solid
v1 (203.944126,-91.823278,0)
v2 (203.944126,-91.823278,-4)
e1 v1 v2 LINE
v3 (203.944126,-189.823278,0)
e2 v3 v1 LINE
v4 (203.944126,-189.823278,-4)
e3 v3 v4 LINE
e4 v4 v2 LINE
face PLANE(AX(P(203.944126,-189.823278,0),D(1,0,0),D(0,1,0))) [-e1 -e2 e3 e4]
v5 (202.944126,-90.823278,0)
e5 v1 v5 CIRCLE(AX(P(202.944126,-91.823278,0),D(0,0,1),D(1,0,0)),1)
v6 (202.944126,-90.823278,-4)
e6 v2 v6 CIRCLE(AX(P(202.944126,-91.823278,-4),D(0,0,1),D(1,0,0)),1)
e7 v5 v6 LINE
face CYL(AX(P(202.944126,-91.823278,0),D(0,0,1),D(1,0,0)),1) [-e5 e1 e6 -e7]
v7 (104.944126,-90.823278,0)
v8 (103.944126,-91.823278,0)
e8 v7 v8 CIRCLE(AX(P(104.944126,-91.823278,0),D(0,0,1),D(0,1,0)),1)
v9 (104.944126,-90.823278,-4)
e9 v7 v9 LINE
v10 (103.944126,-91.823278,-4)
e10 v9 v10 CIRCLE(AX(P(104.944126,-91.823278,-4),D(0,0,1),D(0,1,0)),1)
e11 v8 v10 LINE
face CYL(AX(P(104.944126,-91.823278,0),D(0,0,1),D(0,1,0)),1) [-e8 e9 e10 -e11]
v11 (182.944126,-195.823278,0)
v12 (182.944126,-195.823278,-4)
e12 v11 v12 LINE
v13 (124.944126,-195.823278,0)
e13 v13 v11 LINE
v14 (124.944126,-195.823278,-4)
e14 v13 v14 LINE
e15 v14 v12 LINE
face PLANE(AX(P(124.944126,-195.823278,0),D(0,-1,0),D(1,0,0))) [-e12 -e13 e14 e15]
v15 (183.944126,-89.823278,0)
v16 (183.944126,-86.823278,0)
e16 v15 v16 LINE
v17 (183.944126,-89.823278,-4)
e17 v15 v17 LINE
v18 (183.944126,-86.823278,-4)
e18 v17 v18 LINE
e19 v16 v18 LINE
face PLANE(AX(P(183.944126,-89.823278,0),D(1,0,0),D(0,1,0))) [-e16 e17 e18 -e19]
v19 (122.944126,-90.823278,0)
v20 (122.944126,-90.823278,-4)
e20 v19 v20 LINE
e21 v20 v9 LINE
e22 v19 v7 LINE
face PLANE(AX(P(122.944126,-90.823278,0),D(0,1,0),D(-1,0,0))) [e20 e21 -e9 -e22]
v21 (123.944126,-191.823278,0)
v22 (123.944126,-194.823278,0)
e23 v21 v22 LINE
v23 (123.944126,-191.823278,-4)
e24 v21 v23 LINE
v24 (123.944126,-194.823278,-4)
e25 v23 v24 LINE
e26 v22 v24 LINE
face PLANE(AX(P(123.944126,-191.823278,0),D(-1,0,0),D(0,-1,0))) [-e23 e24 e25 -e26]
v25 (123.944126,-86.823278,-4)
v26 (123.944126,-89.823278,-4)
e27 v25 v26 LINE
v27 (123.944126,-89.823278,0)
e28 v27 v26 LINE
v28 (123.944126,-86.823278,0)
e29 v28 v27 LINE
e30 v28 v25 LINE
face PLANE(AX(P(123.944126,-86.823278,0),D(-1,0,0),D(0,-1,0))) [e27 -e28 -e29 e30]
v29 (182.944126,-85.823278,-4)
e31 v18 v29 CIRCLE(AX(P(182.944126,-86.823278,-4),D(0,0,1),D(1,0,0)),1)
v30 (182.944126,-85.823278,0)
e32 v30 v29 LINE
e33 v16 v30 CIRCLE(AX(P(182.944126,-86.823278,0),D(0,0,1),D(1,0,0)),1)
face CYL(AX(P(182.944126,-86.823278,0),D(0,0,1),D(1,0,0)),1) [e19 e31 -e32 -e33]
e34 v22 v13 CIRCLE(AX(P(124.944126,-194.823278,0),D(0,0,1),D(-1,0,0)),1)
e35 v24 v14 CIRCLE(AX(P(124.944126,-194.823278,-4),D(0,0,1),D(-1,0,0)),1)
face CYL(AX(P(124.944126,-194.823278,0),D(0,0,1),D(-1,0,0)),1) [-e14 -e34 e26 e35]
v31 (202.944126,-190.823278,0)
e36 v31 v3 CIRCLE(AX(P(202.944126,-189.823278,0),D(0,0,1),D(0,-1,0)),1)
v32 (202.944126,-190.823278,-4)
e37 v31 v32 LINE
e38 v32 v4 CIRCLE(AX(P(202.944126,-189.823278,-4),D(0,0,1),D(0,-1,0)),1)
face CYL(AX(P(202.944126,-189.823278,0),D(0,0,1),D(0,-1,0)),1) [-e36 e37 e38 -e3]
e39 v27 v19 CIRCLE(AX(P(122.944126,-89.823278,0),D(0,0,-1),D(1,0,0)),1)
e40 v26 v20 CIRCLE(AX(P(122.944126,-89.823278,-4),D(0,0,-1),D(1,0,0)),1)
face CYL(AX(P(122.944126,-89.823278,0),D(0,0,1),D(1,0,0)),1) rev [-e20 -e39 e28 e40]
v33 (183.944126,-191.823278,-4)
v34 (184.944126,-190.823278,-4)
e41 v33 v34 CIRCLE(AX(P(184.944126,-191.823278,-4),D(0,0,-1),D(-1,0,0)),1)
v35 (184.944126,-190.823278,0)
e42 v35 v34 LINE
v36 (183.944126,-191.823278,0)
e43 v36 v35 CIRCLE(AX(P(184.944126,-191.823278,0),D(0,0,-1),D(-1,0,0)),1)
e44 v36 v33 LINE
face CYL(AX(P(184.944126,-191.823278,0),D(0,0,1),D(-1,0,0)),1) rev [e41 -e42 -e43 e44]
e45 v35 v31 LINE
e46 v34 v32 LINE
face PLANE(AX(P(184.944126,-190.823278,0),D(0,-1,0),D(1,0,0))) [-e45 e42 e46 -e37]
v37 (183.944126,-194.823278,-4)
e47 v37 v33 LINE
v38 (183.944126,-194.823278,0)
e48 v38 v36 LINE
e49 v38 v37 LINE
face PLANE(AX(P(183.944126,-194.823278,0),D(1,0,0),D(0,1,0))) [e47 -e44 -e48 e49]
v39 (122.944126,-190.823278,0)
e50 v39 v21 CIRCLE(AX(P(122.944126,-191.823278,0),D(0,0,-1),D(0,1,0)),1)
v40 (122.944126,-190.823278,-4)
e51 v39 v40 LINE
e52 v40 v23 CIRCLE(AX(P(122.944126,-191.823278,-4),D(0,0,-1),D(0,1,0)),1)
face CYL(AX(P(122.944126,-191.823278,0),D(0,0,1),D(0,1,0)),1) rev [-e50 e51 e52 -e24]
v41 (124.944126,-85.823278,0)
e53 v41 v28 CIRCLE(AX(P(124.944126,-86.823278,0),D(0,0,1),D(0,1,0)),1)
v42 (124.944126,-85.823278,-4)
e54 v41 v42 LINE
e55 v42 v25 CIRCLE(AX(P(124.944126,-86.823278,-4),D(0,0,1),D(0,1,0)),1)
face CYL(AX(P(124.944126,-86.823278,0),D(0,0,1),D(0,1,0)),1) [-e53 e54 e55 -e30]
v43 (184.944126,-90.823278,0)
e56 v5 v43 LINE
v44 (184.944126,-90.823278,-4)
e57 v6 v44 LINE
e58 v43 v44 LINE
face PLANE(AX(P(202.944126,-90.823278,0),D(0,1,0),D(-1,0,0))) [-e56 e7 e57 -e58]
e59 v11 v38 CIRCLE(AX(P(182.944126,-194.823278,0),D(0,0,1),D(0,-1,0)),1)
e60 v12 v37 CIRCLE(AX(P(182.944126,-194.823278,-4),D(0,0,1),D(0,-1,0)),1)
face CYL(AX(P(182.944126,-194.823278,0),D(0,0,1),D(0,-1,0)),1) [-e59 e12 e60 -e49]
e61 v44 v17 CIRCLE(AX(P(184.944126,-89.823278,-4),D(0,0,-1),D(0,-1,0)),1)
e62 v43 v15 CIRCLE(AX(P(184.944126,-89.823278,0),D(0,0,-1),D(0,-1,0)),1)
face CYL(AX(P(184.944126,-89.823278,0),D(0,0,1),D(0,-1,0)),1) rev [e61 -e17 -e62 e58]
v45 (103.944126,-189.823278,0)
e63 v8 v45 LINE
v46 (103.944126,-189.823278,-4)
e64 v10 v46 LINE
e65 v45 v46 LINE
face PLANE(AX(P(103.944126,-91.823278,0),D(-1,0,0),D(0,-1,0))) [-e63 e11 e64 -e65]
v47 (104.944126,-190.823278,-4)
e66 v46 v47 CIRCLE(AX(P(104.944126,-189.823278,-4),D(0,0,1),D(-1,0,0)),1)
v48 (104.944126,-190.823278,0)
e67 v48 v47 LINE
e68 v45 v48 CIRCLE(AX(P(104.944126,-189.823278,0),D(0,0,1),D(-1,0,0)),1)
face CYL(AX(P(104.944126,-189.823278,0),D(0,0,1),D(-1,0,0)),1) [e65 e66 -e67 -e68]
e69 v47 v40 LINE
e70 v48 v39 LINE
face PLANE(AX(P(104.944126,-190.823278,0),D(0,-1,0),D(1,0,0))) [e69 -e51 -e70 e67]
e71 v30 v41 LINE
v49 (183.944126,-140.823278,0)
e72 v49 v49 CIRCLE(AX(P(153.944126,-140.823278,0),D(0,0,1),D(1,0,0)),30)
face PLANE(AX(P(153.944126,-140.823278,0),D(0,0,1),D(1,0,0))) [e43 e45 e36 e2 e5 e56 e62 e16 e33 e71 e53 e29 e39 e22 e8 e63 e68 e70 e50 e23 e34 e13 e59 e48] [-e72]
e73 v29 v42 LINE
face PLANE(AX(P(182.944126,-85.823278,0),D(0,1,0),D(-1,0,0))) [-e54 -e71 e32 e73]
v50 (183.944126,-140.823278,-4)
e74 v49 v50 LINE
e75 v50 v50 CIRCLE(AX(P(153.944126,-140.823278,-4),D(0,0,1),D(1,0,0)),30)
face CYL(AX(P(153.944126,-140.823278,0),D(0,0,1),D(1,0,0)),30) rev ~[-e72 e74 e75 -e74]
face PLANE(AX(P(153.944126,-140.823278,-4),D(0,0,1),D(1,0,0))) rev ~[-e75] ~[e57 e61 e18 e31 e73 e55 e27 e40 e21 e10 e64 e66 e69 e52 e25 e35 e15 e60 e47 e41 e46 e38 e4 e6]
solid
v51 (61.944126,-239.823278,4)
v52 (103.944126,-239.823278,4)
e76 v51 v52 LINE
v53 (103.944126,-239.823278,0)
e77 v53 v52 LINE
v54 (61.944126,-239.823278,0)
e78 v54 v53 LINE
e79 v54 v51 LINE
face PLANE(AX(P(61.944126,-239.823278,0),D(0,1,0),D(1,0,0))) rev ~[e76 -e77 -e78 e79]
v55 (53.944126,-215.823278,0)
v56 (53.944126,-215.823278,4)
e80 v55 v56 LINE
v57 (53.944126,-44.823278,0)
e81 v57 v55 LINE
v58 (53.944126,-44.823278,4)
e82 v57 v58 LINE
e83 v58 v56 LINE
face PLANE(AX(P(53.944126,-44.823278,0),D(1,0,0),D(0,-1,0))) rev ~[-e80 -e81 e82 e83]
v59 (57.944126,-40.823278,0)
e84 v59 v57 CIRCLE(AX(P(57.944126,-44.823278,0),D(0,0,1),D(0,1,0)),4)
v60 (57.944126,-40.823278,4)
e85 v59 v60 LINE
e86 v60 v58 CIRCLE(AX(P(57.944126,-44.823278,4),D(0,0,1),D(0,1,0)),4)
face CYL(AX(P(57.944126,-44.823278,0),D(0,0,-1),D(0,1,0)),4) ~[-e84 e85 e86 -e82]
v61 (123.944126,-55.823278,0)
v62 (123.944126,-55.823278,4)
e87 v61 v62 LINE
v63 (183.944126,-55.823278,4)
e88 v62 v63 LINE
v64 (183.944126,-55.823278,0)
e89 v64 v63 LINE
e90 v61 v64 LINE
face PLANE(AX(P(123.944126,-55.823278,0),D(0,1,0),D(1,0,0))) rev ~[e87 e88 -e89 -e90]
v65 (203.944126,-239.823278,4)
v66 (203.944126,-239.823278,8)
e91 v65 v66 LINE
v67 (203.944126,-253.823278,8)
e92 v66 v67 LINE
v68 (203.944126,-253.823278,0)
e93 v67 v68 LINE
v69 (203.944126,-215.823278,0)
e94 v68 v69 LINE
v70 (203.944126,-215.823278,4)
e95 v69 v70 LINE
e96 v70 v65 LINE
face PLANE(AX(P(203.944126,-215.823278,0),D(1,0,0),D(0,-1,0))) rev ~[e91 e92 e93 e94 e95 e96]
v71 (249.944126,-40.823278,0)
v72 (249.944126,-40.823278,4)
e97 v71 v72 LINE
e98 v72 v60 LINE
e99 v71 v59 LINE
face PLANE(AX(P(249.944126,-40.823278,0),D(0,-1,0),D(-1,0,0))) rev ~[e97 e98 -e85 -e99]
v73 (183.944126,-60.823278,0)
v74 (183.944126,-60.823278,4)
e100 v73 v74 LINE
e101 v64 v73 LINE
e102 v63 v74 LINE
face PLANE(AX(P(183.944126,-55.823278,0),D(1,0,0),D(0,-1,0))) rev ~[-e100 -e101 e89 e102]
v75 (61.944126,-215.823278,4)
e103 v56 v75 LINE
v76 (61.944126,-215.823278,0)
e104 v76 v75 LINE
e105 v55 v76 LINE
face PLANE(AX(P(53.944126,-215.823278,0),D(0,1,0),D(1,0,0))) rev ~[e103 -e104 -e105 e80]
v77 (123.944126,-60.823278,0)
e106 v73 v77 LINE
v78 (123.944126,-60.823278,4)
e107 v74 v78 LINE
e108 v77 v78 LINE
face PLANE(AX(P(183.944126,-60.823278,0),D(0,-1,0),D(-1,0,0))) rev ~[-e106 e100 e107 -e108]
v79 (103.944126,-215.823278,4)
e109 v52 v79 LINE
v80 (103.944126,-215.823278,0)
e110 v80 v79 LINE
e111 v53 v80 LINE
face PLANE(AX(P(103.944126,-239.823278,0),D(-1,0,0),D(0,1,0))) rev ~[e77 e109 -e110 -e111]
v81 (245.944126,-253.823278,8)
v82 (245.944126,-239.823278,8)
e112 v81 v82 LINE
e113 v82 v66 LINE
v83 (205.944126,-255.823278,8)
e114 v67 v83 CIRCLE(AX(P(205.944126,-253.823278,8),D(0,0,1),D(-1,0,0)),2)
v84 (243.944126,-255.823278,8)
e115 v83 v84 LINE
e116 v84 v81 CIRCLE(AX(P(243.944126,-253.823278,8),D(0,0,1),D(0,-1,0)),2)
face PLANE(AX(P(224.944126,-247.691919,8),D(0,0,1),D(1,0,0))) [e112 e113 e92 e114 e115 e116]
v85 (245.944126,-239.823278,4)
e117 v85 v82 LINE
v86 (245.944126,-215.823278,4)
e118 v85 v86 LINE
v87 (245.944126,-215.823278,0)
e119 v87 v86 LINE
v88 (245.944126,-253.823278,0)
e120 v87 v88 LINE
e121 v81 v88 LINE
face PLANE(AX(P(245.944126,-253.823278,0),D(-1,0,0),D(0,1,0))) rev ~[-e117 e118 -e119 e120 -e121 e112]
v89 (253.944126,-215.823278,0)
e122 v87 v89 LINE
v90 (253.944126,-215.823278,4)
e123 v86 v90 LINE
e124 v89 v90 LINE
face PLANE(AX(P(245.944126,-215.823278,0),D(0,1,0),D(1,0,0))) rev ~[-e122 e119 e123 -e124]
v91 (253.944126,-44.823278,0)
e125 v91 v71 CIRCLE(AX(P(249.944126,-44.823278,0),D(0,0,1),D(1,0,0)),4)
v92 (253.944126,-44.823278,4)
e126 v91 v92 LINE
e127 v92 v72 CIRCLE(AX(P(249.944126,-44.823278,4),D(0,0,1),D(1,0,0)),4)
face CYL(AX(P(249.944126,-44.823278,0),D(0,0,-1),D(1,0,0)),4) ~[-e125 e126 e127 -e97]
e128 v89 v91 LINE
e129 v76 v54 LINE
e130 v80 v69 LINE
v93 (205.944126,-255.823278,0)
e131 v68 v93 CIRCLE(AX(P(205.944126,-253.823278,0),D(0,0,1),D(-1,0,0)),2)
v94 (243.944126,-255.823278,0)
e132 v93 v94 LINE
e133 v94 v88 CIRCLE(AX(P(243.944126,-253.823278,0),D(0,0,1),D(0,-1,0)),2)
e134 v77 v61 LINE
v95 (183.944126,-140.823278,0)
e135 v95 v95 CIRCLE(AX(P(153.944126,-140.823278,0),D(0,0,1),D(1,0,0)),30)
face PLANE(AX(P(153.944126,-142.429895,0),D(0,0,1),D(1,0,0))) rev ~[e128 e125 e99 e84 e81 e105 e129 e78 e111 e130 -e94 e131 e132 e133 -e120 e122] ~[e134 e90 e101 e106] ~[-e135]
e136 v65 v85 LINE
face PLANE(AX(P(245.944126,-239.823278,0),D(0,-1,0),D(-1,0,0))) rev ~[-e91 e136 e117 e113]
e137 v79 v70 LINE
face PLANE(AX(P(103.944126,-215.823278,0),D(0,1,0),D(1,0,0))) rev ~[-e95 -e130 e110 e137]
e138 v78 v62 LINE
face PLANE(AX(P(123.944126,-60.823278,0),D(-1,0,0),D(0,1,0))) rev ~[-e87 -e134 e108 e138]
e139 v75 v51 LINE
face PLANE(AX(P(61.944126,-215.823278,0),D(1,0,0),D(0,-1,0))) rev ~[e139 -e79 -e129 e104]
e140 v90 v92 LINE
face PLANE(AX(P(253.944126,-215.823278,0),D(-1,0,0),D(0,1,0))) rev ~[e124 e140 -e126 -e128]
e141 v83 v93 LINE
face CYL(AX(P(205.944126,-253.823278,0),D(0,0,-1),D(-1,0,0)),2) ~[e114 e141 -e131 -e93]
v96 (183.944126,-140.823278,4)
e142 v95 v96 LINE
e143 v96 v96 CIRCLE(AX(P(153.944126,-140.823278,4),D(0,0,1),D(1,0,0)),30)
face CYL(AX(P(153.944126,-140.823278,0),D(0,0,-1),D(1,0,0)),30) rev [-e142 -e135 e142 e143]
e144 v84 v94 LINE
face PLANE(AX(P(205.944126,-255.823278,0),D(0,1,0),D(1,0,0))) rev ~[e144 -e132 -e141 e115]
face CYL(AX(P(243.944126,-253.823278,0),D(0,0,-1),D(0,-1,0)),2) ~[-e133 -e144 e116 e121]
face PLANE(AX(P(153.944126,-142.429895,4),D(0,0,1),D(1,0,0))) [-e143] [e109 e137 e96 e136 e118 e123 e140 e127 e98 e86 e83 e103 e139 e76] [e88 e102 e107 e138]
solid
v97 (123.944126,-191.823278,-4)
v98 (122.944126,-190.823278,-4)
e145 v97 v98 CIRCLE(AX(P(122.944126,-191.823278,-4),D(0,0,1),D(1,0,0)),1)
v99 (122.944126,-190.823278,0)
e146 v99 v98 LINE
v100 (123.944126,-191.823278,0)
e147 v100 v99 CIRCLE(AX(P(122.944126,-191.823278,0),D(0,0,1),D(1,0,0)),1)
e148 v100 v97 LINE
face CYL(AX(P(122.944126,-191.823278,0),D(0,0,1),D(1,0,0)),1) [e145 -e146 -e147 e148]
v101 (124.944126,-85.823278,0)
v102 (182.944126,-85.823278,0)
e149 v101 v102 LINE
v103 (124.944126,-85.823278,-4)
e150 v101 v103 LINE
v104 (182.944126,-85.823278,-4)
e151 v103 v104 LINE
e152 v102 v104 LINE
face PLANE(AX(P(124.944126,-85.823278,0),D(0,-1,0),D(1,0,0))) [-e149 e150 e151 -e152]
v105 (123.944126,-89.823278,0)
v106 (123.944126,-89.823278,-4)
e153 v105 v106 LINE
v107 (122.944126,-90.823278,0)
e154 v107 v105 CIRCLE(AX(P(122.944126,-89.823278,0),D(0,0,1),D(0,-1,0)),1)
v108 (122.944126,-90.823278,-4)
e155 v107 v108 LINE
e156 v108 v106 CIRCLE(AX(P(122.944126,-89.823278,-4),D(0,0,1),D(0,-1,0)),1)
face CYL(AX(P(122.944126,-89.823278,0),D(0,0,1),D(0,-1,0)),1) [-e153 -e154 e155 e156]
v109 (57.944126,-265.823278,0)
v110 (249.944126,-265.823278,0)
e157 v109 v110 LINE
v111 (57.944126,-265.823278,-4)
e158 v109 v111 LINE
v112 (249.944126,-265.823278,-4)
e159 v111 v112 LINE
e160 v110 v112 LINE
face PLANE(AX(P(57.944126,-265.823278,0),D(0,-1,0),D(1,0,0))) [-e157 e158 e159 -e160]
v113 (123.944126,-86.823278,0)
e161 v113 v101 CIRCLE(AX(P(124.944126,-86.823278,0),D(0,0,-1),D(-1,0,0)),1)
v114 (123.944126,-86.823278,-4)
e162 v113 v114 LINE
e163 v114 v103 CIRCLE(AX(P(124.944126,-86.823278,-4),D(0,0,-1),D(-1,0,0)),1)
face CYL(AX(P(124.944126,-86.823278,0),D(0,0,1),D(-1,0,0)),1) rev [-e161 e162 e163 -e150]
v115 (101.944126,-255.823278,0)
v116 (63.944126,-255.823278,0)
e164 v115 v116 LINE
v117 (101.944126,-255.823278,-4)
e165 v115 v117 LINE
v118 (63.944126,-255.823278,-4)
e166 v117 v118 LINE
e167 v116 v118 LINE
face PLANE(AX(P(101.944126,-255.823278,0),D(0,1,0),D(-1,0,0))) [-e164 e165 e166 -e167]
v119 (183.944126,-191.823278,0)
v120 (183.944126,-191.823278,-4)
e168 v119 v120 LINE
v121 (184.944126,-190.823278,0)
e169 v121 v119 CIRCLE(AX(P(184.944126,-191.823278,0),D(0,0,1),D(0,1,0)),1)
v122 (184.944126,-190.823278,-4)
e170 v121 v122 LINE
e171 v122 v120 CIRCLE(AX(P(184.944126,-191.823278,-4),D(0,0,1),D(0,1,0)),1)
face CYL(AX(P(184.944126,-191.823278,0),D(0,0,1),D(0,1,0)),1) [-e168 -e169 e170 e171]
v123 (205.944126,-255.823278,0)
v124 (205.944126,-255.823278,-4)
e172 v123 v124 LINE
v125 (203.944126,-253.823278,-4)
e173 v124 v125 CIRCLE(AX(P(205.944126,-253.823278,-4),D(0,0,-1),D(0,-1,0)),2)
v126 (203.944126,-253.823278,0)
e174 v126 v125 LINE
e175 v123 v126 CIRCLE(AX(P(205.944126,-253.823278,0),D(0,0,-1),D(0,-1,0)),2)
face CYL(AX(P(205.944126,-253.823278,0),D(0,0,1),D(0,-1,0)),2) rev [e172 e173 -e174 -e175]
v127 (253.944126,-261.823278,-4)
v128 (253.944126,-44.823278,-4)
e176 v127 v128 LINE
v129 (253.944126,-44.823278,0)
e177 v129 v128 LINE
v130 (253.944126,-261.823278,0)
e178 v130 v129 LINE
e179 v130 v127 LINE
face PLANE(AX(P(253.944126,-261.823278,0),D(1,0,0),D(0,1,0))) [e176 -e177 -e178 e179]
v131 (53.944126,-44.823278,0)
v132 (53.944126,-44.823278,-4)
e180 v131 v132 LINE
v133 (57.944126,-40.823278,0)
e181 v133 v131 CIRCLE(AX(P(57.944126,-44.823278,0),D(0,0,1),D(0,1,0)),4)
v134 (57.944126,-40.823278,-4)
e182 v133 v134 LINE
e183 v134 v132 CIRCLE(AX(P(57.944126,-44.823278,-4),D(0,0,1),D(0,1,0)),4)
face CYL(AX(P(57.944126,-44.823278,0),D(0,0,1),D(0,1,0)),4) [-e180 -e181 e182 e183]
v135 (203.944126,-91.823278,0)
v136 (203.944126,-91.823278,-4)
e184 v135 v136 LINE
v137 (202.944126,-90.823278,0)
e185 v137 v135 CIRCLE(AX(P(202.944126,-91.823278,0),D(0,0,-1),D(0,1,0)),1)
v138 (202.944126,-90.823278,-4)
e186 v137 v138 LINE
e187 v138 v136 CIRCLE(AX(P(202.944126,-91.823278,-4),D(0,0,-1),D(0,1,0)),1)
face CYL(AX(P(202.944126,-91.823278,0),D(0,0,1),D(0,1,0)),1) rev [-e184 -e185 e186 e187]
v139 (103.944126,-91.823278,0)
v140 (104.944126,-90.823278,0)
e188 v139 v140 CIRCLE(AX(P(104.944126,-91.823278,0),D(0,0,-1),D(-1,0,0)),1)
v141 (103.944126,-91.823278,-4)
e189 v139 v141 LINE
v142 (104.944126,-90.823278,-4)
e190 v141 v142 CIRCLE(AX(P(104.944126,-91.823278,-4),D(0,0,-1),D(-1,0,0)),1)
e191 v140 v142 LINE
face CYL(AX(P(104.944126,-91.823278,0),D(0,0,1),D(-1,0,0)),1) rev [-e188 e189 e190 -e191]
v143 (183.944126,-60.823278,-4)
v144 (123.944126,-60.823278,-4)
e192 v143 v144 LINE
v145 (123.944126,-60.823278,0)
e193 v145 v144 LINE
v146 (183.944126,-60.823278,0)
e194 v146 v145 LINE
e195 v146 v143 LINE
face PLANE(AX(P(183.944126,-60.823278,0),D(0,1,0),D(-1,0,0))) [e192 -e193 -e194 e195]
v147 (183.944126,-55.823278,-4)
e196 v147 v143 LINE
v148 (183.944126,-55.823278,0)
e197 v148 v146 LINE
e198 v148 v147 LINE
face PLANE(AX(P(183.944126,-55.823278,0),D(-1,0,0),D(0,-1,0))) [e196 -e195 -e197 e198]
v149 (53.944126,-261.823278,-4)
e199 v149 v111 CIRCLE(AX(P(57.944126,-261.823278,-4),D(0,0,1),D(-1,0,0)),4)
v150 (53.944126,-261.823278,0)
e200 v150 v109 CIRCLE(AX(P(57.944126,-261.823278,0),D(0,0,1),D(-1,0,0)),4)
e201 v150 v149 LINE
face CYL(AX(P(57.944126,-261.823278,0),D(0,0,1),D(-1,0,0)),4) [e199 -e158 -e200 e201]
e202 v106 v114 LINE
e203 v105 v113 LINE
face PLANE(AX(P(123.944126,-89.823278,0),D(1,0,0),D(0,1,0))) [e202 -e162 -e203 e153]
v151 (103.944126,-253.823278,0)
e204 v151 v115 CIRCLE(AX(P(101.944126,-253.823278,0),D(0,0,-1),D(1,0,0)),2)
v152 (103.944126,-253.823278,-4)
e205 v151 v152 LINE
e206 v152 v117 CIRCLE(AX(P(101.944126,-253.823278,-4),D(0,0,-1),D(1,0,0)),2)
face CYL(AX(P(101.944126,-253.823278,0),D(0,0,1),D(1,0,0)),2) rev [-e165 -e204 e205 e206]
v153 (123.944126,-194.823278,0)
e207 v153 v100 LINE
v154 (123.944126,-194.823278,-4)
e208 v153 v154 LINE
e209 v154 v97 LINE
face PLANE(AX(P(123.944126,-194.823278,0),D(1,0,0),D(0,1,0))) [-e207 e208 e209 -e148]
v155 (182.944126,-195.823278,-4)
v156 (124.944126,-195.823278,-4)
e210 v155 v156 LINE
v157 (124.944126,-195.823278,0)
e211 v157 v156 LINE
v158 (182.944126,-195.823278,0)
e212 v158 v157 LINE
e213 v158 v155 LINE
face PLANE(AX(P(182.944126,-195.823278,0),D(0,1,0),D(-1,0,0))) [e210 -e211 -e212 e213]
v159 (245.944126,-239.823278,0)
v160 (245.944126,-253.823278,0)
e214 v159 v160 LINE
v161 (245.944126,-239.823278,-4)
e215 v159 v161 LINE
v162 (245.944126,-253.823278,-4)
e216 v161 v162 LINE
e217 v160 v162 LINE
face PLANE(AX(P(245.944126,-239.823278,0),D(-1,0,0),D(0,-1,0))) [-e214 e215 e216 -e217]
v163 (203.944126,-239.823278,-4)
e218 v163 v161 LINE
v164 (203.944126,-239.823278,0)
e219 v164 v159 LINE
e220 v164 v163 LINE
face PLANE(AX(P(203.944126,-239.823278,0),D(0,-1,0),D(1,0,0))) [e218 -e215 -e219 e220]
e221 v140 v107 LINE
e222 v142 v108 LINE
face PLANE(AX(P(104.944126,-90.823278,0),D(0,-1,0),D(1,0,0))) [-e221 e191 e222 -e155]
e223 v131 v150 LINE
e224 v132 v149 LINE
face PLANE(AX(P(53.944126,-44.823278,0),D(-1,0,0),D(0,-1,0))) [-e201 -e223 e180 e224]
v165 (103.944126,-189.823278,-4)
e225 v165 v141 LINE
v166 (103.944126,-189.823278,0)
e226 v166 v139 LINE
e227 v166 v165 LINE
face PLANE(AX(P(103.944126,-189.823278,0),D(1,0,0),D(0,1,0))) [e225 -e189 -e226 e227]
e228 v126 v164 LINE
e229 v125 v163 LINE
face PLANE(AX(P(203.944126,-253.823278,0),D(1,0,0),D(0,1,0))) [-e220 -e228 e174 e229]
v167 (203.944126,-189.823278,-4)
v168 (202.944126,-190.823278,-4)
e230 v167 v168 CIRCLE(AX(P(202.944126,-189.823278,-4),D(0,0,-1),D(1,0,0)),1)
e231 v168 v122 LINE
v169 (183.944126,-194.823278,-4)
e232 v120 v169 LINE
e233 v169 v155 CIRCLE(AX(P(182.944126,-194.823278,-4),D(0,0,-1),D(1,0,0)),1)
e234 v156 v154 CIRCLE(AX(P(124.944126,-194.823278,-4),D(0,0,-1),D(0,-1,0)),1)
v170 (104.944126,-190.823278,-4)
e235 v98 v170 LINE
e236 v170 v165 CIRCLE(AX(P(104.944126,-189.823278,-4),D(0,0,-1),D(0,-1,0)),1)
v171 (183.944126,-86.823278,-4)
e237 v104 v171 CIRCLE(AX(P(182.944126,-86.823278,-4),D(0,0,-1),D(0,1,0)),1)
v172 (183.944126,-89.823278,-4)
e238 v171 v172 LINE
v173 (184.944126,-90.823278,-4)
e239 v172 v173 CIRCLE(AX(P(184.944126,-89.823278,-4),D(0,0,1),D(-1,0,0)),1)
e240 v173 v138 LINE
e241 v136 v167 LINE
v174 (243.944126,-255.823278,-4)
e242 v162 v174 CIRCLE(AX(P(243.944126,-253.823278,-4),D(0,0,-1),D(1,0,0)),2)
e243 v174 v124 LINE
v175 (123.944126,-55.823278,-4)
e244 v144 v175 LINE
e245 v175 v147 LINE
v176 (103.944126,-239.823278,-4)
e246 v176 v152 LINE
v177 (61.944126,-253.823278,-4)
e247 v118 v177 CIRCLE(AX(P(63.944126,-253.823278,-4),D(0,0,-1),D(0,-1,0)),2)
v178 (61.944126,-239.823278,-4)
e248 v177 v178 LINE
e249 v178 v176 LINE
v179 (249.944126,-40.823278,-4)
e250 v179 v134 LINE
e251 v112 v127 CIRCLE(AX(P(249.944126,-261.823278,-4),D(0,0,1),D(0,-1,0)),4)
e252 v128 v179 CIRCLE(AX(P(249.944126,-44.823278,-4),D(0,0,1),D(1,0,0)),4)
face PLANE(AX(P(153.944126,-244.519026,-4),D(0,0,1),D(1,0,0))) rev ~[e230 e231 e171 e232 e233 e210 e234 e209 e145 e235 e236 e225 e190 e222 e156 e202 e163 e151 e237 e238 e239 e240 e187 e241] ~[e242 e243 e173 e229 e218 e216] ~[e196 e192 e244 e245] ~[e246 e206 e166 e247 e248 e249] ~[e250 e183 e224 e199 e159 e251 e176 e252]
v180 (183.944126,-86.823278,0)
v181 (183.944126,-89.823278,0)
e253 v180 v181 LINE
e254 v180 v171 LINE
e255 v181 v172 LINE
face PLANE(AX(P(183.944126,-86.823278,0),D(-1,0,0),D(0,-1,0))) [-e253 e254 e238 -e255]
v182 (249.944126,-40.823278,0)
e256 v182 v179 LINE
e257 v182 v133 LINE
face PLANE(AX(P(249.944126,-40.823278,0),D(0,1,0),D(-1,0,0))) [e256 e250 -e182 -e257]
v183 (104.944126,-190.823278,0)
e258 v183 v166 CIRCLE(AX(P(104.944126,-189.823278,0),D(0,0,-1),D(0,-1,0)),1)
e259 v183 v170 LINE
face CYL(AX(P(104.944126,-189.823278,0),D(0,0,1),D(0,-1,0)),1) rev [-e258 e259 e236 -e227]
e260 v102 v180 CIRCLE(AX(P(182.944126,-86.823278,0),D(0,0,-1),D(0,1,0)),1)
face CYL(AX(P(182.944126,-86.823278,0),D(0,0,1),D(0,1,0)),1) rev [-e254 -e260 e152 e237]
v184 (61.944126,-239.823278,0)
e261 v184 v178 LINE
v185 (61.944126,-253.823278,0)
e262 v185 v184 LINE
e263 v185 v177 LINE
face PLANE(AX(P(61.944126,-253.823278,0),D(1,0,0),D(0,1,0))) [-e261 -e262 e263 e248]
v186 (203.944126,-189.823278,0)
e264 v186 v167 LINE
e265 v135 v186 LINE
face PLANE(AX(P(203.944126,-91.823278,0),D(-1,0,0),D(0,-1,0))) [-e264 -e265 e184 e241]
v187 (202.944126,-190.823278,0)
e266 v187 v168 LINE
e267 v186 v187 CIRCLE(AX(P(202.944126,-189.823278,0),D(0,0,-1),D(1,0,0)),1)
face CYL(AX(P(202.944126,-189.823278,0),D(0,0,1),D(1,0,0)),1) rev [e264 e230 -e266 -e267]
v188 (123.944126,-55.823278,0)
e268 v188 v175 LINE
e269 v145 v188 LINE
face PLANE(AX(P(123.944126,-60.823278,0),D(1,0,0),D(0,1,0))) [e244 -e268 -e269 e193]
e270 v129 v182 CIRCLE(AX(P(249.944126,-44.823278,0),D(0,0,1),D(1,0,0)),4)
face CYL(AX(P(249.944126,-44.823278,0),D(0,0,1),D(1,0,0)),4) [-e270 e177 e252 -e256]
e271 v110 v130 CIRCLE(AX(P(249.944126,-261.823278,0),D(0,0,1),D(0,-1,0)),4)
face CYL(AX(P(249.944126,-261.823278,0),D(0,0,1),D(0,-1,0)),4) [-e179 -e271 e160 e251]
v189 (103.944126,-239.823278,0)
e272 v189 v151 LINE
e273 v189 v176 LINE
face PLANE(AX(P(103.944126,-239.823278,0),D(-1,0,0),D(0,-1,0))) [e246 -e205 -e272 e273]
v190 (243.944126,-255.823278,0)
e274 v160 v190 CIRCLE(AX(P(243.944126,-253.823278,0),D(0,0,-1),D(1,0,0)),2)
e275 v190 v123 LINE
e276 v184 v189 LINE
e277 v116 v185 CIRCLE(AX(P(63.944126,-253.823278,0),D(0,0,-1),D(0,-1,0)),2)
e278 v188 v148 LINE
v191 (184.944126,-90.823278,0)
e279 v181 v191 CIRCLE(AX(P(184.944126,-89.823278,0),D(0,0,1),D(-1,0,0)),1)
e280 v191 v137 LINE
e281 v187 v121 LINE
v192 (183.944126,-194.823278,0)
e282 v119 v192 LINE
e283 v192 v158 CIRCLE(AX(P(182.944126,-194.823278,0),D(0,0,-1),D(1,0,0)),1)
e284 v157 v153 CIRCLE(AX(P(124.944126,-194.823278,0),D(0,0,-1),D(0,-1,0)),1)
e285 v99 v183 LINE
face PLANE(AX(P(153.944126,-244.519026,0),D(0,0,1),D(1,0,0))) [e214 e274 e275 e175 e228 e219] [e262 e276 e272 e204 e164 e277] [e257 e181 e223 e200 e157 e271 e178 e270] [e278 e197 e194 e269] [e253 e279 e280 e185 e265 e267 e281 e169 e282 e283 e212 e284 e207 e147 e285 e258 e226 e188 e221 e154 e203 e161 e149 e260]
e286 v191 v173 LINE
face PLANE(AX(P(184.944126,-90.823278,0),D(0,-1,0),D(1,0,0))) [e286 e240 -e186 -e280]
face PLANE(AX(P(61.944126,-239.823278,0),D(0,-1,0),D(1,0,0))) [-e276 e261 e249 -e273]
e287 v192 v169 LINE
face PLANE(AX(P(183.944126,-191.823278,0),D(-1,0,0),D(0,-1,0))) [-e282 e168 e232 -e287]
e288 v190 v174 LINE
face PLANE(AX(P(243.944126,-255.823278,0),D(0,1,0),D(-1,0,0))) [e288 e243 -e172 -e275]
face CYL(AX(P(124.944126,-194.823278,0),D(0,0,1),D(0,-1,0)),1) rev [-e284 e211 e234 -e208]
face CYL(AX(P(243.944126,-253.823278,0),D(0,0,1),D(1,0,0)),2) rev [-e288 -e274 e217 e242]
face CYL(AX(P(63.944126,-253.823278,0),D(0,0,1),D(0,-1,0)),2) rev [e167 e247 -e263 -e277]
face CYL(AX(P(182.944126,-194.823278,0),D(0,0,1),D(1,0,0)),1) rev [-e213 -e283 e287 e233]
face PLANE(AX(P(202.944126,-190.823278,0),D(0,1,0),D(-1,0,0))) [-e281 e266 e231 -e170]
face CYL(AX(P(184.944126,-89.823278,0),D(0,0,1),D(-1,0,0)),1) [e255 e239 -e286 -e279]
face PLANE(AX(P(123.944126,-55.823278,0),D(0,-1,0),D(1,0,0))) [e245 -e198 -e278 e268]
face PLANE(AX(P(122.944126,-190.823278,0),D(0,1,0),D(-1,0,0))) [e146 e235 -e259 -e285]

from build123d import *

# Parameters (mm, degrees)
F1_R     = 30
F2_DEPTH = 4
F3_DEPTH = 4
F4_DEPTH = 4
F5_DEPTH = 8


with BuildPart() as f2:
    # F1 (on Top) → F2 (new body)
    with BuildSketch(Plane.XY):
        with BuildLine():
            Line((249.9441257715, -40.8232776821), (57.9441257715, -40.8232776821))
            ThreePointArc((57.9441257715, -40.8232776821), (55.1156986468, -41.9948505573), (53.9441257715, -44.8232776821))
            Line((53.9441257715, -44.8232776821), (53.9441257715, -215.8232776821))
            Line((53.9441257715, -215.8232776821), (61.9441257715, -215.8232776821))
            Line((61.9441257715, -215.8232776821), (61.9441257715, -239.8232776821))
            Line((61.9441257715, -239.8232776821), (103.9441257715, -239.8232776821))
            Line((103.9441257715, -239.8232776821), (103.9441257715, -215.8232776821))
            Line((103.9441257715, -215.8232776821), (203.9441257715, -215.8232776821))
            Line((203.9441257715, -215.8232776821), (203.9441257715, -239.8232776821))
            Line((203.9441257715, -239.8232776821), (245.9441257715, -239.8232776821))
            Line((245.9441257715, -239.8232776821), (245.9441257715, -215.8232776821))
            Line((245.9441257715, -215.8232776821), (253.9441257715, -215.8232776821))
            Line((253.9441257715, -215.8232776821), (253.9441257715, -44.8232776821))
            ThreePointArc((253.9441257715, -44.8232776821), (252.7725528963, -41.9948505573), (249.9441257715, -40.8232776821))
        make_face()
        with BuildLine():
            Line((124.9441257715, -85.8232776821), (153.9441257715, -85.8232776821))
            Line((153.9441257715, -85.8232776821), (182.9441257715, -85.8232776821))
            ThreePointArc((182.9441257715, -85.8232776821), (183.6512325527, -86.1161709009), (183.9441257715, -86.8232776821))
            Line((183.9441257715, -86.8232776821), (183.9441257715, -89.8232776821))
            ThreePointArc((183.9441257715, -89.8232776821), (184.2370189903, -90.5303844633), (184.9441257715, -90.8232776821))
            Line((184.9441257715, -90.8232776821), (202.9441257715, -90.8232776821))
            ThreePointArc((202.9441257715, -90.8232776821), (203.6512325527, -91.1161709009), (203.9441257715, -91.8232776821))
            Line((203.9441257715, -91.8232776821), (203.9441257715, -140.8232776821))
            Line((203.9441257715, -140.8232776821), (203.9441257715, -189.8232776821))
            ThreePointArc((203.9441257715, -189.8232776821), (203.6512325527, -190.5303844633), (202.9441257715, -190.8232776821))
            Line((202.9441257715, -190.8232776821), (184.9441257715, -190.8232776821))
            ThreePointArc((184.9441257715, -190.8232776821), (184.2370189903, -191.1161709009), (183.9441257715, -191.8232776821))
            Line((183.9441257715, -191.8232776821), (183.9441257715, -194.8232776821))
            ThreePointArc((183.9441257715, -194.8232776821), (183.6512325527, -195.5303844633), (182.9441257715, -195.8232776821))
            Line((182.9441257715, -195.8232776821), (153.9441257715, -195.8232776821))
            Line((153.9441257715, -195.8232776821), (124.9441257715, -195.8232776821))
            ThreePointArc((124.9441257715, -195.8232776821), (124.2370189903, -195.5303844633), (123.9441257715, -194.8232776821))
            Line((123.9441257715, -194.8232776821), (123.9441257715, -191.8232776821))
            ThreePointArc((123.9441257715, -191.8232776821), (123.6512325527, -191.1161709009), (122.9441257715, -190.8232776821))
            Line((122.9441257715, -190.8232776821), (104.9441257715, -190.8232776821))
            ThreePointArc((104.9441257715, -190.8232776821), (104.2370189903, -190.5303844633), (103.9441257715, -189.8232776821))
            Line((103.9441257715, -189.8232776821), (103.9441257715, -140.8232776821))
            Line((103.9441257715, -140.8232776821), (103.9441257715, -91.8232776821))
            ThreePointArc((103.9441257715, -91.8232776821), (104.2370189903, -91.1161709009), (104.9441257715, -90.8232776821))
            Line((104.9441257715, -90.8232776821), (122.9441257715, -90.8232776821))
            ThreePointArc((122.9441257715, -90.8232776821), (123.6512325527, -90.5303844633), (123.9441257715, -89.8232776821))
            Line((123.9441257715, -89.8232776821), (123.9441257715, -86.8232776821))
            ThreePointArc((123.9441257715, -86.8232776821), (124.2370189903, -86.1161709009), (124.9441257715, -85.8232776821))
        make_face(mode=Mode.SUBTRACT)
        Polygon((123.9441257715, -60.8232776821), (123.9441257715, -55.8232776821), (153.9441257715, -55.8232776821), (183.9441257715, -55.8232776821), (183.9441257715, -60.8232776821), (153.9441257715, -60.8232776821), align=None, mode=Mode.SUBTRACT)
        with BuildLine():
            Line((245.9441257715, -253.8232776821), (245.9441257715, -239.8232776821))
            Line((245.9441257715, -239.8232776821), (203.9441257715, -239.8232776821))
            Line((203.9441257715, -239.8232776821), (203.9441257715, -253.8232776821))
            ThreePointArc((203.9441257715, -253.8232776821), (204.5299122091, -255.2374912444), (205.9441257715, -255.8232776821))
            Line((205.9441257715, -255.8232776821), (243.9441257715, -255.8232776821))
            ThreePointArc((243.9441257715, -255.8232776821), (245.3583393339, -255.2374912444), (245.9441257715, -253.8232776821))
        make_face()
        with BuildLine():
            Line((182.9441257715, -85.8232776821), (153.9441257715, -85.8232776821))
            Line((153.9441257715, -85.8232776821), (124.9441257715, -85.8232776821))
            ThreePointArc((124.9441257715, -85.8232776821), (124.2370189903, -86.1161709009), (123.9441257715, -86.8232776821))
            Line((123.9441257715, -86.8232776821), (123.9441257715, -89.8232776821))
            ThreePointArc((123.9441257715, -89.8232776821), (123.6512325527, -90.5303844633), (122.9441257715, -90.8232776821))
            Line((122.9441257715, -90.8232776821), (104.9441257715, -90.8232776821))
            ThreePointArc((104.9441257715, -90.8232776821), (104.2370189903, -91.1161709009), (103.9441257715, -91.8232776821))
            Line((103.9441257715, -91.8232776821), (103.9441257715, -140.8232776821))
            Line((103.9441257715, -140.8232776821), (103.9441257715, -189.8232776821))
            ThreePointArc((103.9441257715, -189.8232776821), (104.2370189903, -190.5303844633), (104.9441257715, -190.8232776821))
            Line((104.9441257715, -190.8232776821), (122.9441257715, -190.8232776821))
            ThreePointArc((122.9441257715, -190.8232776821), (123.6512325527, -191.1161709009), (123.9441257715, -191.8232776821))
            Line((123.9441257715, -191.8232776821), (123.9441257715, -194.8232776821))
            ThreePointArc((123.9441257715, -194.8232776821), (124.2370189903, -195.5303844633), (124.9441257715, -195.8232776821))
            Line((124.9441257715, -195.8232776821), (153.9441257715, -195.8232776821))
            Line((153.9441257715, -195.8232776821), (182.9441257715, -195.8232776821))
            ThreePointArc((182.9441257715, -195.8232776821), (183.6512325527, -195.5303844633), (183.9441257715, -194.8232776821))
            Line((183.9441257715, -194.8232776821), (183.9441257715, -191.8232776821))
            ThreePointArc((183.9441257715, -191.8232776821), (184.2370189903, -191.1161709009), (184.9441257715, -190.8232776821))
            Line((184.9441257715, -190.8232776821), (202.9441257715, -190.8232776821))
            ThreePointArc((202.9441257715, -190.8232776821), (203.6512325527, -190.5303844633), (203.9441257715, -189.8232776821))
            Line((203.9441257715, -189.8232776821), (203.9441257715, -140.8232776821))
            Line((203.9441257715, -140.8232776821), (203.9441257715, -91.8232776821))
            ThreePointArc((203.9441257715, -91.8232776821), (203.6512325527, -91.1161709009), (202.9441257715, -90.8232776821))
            Line((202.9441257715, -90.8232776821), (184.9441257715, -90.8232776821))
            ThreePointArc((184.9441257715, -90.8232776821), (184.2370189903, -90.5303844633), (183.9441257715, -89.8232776821))
            Line((183.9441257715, -89.8232776821), (183.9441257715, -86.8232776821))
            ThreePointArc((183.9441257715, -86.8232776821), (183.6512325527, -86.1161709009), (182.9441257715, -85.8232776821))
        make_face()
        with Locations((153.9441257715, -140.8232776821)):
            Circle(F1_R, mode=Mode.SUBTRACT)
    extrude(amount=F2_DEPTH)

    # F1 (on Top) → F5 (join)
    with BuildSketch(Plane.XY):
        with BuildLine():
            Line((245.9441257715, -253.8232776821), (245.9441257715, -239.8232776821))
            Line((245.9441257715, -239.8232776821), (203.9441257715, -239.8232776821))
            Line((203.9441257715, -239.8232776821), (203.9441257715, -253.8232776821))
            ThreePointArc((203.9441257715, -253.8232776821), (204.5299122091, -255.2374912444), (205.9441257715, -255.8232776821))
            Line((205.9441257715, -255.8232776821), (243.9441257715, -255.8232776821))
            ThreePointArc((243.9441257715, -255.8232776821), (245.3583393339, -255.2374912444), (245.9441257715, -253.8232776821))
        make_face()
    extrude(amount=F5_DEPTH)


with BuildPart() as f3:
    # F1 (on Top) → F3 (new body)
    with BuildSketch(Plane.XY):
        with BuildLine():
            Line((182.9441257715, -85.8232776821), (153.9441257715, -85.8232776821))
            Line((153.9441257715, -85.8232776821), (124.9441257715, -85.8232776821))
            ThreePointArc((124.9441257715, -85.8232776821), (124.2370189903, -86.1161709009), (123.9441257715, -86.8232776821))
            Line((123.9441257715, -86.8232776821), (123.9441257715, -89.8232776821))
            ThreePointArc((123.9441257715, -89.8232776821), (123.6512325527, -90.5303844633), (122.9441257715, -90.8232776821))
            Line((122.9441257715, -90.8232776821), (104.9441257715, -90.8232776821))
            ThreePointArc((104.9441257715, -90.8232776821), (104.2370189903, -91.1161709009), (103.9441257715, -91.8232776821))
            Line((103.9441257715, -91.8232776821), (103.9441257715, -140.8232776821))
            Line((103.9441257715, -140.8232776821), (103.9441257715, -189.8232776821))
            ThreePointArc((103.9441257715, -189.8232776821), (104.2370189903, -190.5303844633), (104.9441257715, -190.8232776821))
            Line((104.9441257715, -190.8232776821), (122.9441257715, -190.8232776821))
            ThreePointArc((122.9441257715, -190.8232776821), (123.6512325527, -191.1161709009), (123.9441257715, -191.8232776821))
            Line((123.9441257715, -191.8232776821), (123.9441257715, -194.8232776821))
            ThreePointArc((123.9441257715, -194.8232776821), (124.2370189903, -195.5303844633), (124.9441257715, -195.8232776821))
            Line((124.9441257715, -195.8232776821), (153.9441257715, -195.8232776821))
            Line((153.9441257715, -195.8232776821), (182.9441257715, -195.8232776821))
            ThreePointArc((182.9441257715, -195.8232776821), (183.6512325527, -195.5303844633), (183.9441257715, -194.8232776821))
            Line((183.9441257715, -194.8232776821), (183.9441257715, -191.8232776821))
            ThreePointArc((183.9441257715, -191.8232776821), (184.2370189903, -191.1161709009), (184.9441257715, -190.8232776821))
            Line((184.9441257715, -190.8232776821), (202.9441257715, -190.8232776821))
            ThreePointArc((202.9441257715, -190.8232776821), (203.6512325527, -190.5303844633), (203.9441257715, -189.8232776821))
            Line((203.9441257715, -189.8232776821), (203.9441257715, -140.8232776821))
            Line((203.9441257715, -140.8232776821), (203.9441257715, -91.8232776821))
            ThreePointArc((203.9441257715, -91.8232776821), (203.6512325527, -91.1161709009), (202.9441257715, -90.8232776821))
            Line((202.9441257715, -90.8232776821), (184.9441257715, -90.8232776821))
            ThreePointArc((184.9441257715, -90.8232776821), (184.2370189903, -90.5303844633), (183.9441257715, -89.8232776821))
            Line((183.9441257715, -89.8232776821), (183.9441257715, -86.8232776821))
            ThreePointArc((183.9441257715, -86.8232776821), (183.6512325527, -86.1161709009), (182.9441257715, -85.8232776821))
        make_face()
        with Locations((153.9441257715, -140.8232776821)):
            Circle(F1_R, mode=Mode.SUBTRACT)
    extrude(amount=-F3_DEPTH)


with BuildPart() as f4:
    # F1 (on Top) → F4 (new body)
    with BuildSketch(Plane.XY):
        with BuildLine():
            Line((61.9441257715, -215.8232776821), (53.9441257715, -215.8232776821))
            Line((53.9441257715, -215.8232776821), (53.9441257715, -261.8232776821))
            ThreePointArc((53.9441257715, -261.8232776821), (55.1156986468, -264.6517048068), (57.9441257715, -265.8232776821))
            Line((57.9441257715, -265.8232776821), (249.9441257715, -265.8232776821))
            ThreePointArc((249.9441257715, -265.8232776821), (252.7725528963, -264.6517048068), (253.9441257715, -261.8232776821))
            Line((253.9441257715, -261.8232776821), (253.9441257715, -215.8232776821))
            Line((253.9441257715, -215.8232776821), (245.9441257715, -215.8232776821))
            Line((245.9441257715, -215.8232776821), (245.9441257715, -239.8232776821))
            Line((245.9441257715, -239.8232776821), (245.9441257715, -253.8232776821))
            ThreePointArc((245.9441257715, -253.8232776821), (245.3583393339, -255.2374912444), (243.9441257715, -255.8232776821))
            Line((243.9441257715, -255.8232776821), (205.9441257715, -255.8232776821))
            ThreePointArc((205.9441257715, -255.8232776821), (204.5299122091, -255.2374912444), (203.9441257715, -253.8232776821))
            Line((203.9441257715, -253.8232776821), (203.9441257715, -239.8232776821))
            Line((203.9441257715, -239.8232776821), (203.9441257715, -215.8232776821))
            Line((203.9441257715, -215.8232776821), (103.9441257715, -215.8232776821))
            Line((103.9441257715, -215.8232776821), (103.9441257715, -239.8232776821))
            Line((103.9441257715, -239.8232776821), (103.9441257715, -253.8232776821))
            ThreePointArc((103.9441257715, -253.8232776821), (103.3583393339, -255.2374912444), (101.9441257715, -255.8232776821))
            Line((101.9441257715, -255.8232776821), (63.9441257715, -255.8232776821))
            ThreePointArc((63.9441257715, -255.8232776821), (62.5299122091, -255.2374912444), (61.9441257715, -253.8232776821))
            Line((61.9441257715, -253.8232776821), (61.9441257715, -239.8232776821))
            Line((61.9441257715, -239.8232776821), (61.9441257715, -215.8232776821))
        make_face()
        with BuildLine():
            Line((249.9441257715, -40.8232776821), (57.9441257715, -40.8232776821))
            ThreePointArc((57.9441257715, -40.8232776821), (55.1156986468, -41.9948505573), (53.9441257715, -44.8232776821))
            Line((53.9441257715, -44.8232776821), (53.9441257715, -215.8232776821))
            Line((53.9441257715, -215.8232776821), (61.9441257715, -215.8232776821))
            Line((61.9441257715, -215.8232776821), (61.9441257715, -239.8232776821))
            Line((61.9441257715, -239.8232776821), (103.9441257715, -239.8232776821))
            Line((103.9441257715, -239.8232776821), (103.9441257715, -215.8232776821))
            Line((103.9441257715, -215.8232776821), (203.9441257715, -215.8232776821))
            Line((203.9441257715, -215.8232776821), (203.9441257715, -239.8232776821))
            Line((203.9441257715, -239.8232776821), (245.9441257715, -239.8232776821))
            Line((245.9441257715, -239.8232776821), (245.9441257715, -215.8232776821))
            Line((245.9441257715, -215.8232776821), (253.9441257715, -215.8232776821))
            Line((253.9441257715, -215.8232776821), (253.9441257715, -44.8232776821))
            ThreePointArc((253.9441257715, -44.8232776821), (252.7725528963, -41.9948505573), (249.9441257715, -40.8232776821))
        make_face()
        with BuildLine():
            Line((124.9441257715, -85.8232776821), (153.9441257715, -85.8232776821))
            Line((153.9441257715, -85.8232776821), (182.9441257715, -85.8232776821))
            ThreePointArc((182.9441257715, -85.8232776821), (183.6512325527, -86.1161709009), (183.9441257715, -86.8232776821))
            Line((183.9441257715, -86.8232776821), (183.9441257715, -89.8232776821))
            ThreePointArc((183.9441257715, -89.8232776821), (184.2370189903, -90.5303844633), (184.9441257715, -90.8232776821))
            Line((184.9441257715, -90.8232776821), (202.9441257715, -90.8232776821))
            ThreePointArc((202.9441257715, -90.8232776821), (203.6512325527, -91.1161709009), (203.9441257715, -91.8232776821))
            Line((203.9441257715, -91.8232776821), (203.9441257715, -140.8232776821))
            Line((203.9441257715, -140.8232776821), (203.9441257715, -189.8232776821))
            ThreePointArc((203.9441257715, -189.8232776821), (203.6512325527, -190.5303844633), (202.9441257715, -190.8232776821))
            Line((202.9441257715, -190.8232776821), (184.9441257715, -190.8232776821))
            ThreePointArc((184.9441257715, -190.8232776821), (184.2370189903, -191.1161709009), (183.9441257715, -191.8232776821))
            Line((183.9441257715, -191.8232776821), (183.9441257715, -194.8232776821))
            ThreePointArc((183.9441257715, -194.8232776821), (183.6512325527, -195.5303844633), (182.9441257715, -195.8232776821))
            Line((182.9441257715, -195.8232776821), (153.9441257715, -195.8232776821))
            Line((153.9441257715, -195.8232776821), (124.9441257715, -195.8232776821))
            ThreePointArc((124.9441257715, -195.8232776821), (124.2370189903, -195.5303844633), (123.9441257715, -194.8232776821))
            Line((123.9441257715, -194.8232776821), (123.9441257715, -191.8232776821))
            ThreePointArc((123.9441257715, -191.8232776821), (123.6512325527, -191.1161709009), (122.9441257715, -190.8232776821))
            Line((122.9441257715, -190.8232776821), (104.9441257715, -190.8232776821))
            ThreePointArc((104.9441257715, -190.8232776821), (104.2370189903, -190.5303844633), (103.9441257715, -189.8232776821))
            Line((103.9441257715, -189.8232776821), (103.9441257715, -140.8232776821))
            Line((103.9441257715, -140.8232776821), (103.9441257715, -91.8232776821))
            ThreePointArc((103.9441257715, -91.8232776821), (104.2370189903, -91.1161709009), (104.9441257715, -90.8232776821))
            Line((104.9441257715, -90.8232776821), (122.9441257715, -90.8232776821))
            ThreePointArc((122.9441257715, -90.8232776821), (123.6512325527, -90.5303844633), (123.9441257715, -89.8232776821))
            Line((123.9441257715, -89.8232776821), (123.9441257715, -86.8232776821))
            ThreePointArc((123.9441257715, -86.8232776821), (124.2370189903, -86.1161709009), (124.9441257715, -85.8232776821))
        make_face(mode=Mode.SUBTRACT)
        Polygon((123.9441257715, -60.8232776821), (123.9441257715, -55.8232776821), (153.9441257715, -55.8232776821), (183.9441257715, -55.8232776821), (183.9441257715, -60.8232776821), (153.9441257715, -60.8232776821), align=None, mode=Mode.SUBTRACT)
    extrude(amount=-F4_DEPTH)


solid = Compound([f2.part, f3.part, f4.part])
